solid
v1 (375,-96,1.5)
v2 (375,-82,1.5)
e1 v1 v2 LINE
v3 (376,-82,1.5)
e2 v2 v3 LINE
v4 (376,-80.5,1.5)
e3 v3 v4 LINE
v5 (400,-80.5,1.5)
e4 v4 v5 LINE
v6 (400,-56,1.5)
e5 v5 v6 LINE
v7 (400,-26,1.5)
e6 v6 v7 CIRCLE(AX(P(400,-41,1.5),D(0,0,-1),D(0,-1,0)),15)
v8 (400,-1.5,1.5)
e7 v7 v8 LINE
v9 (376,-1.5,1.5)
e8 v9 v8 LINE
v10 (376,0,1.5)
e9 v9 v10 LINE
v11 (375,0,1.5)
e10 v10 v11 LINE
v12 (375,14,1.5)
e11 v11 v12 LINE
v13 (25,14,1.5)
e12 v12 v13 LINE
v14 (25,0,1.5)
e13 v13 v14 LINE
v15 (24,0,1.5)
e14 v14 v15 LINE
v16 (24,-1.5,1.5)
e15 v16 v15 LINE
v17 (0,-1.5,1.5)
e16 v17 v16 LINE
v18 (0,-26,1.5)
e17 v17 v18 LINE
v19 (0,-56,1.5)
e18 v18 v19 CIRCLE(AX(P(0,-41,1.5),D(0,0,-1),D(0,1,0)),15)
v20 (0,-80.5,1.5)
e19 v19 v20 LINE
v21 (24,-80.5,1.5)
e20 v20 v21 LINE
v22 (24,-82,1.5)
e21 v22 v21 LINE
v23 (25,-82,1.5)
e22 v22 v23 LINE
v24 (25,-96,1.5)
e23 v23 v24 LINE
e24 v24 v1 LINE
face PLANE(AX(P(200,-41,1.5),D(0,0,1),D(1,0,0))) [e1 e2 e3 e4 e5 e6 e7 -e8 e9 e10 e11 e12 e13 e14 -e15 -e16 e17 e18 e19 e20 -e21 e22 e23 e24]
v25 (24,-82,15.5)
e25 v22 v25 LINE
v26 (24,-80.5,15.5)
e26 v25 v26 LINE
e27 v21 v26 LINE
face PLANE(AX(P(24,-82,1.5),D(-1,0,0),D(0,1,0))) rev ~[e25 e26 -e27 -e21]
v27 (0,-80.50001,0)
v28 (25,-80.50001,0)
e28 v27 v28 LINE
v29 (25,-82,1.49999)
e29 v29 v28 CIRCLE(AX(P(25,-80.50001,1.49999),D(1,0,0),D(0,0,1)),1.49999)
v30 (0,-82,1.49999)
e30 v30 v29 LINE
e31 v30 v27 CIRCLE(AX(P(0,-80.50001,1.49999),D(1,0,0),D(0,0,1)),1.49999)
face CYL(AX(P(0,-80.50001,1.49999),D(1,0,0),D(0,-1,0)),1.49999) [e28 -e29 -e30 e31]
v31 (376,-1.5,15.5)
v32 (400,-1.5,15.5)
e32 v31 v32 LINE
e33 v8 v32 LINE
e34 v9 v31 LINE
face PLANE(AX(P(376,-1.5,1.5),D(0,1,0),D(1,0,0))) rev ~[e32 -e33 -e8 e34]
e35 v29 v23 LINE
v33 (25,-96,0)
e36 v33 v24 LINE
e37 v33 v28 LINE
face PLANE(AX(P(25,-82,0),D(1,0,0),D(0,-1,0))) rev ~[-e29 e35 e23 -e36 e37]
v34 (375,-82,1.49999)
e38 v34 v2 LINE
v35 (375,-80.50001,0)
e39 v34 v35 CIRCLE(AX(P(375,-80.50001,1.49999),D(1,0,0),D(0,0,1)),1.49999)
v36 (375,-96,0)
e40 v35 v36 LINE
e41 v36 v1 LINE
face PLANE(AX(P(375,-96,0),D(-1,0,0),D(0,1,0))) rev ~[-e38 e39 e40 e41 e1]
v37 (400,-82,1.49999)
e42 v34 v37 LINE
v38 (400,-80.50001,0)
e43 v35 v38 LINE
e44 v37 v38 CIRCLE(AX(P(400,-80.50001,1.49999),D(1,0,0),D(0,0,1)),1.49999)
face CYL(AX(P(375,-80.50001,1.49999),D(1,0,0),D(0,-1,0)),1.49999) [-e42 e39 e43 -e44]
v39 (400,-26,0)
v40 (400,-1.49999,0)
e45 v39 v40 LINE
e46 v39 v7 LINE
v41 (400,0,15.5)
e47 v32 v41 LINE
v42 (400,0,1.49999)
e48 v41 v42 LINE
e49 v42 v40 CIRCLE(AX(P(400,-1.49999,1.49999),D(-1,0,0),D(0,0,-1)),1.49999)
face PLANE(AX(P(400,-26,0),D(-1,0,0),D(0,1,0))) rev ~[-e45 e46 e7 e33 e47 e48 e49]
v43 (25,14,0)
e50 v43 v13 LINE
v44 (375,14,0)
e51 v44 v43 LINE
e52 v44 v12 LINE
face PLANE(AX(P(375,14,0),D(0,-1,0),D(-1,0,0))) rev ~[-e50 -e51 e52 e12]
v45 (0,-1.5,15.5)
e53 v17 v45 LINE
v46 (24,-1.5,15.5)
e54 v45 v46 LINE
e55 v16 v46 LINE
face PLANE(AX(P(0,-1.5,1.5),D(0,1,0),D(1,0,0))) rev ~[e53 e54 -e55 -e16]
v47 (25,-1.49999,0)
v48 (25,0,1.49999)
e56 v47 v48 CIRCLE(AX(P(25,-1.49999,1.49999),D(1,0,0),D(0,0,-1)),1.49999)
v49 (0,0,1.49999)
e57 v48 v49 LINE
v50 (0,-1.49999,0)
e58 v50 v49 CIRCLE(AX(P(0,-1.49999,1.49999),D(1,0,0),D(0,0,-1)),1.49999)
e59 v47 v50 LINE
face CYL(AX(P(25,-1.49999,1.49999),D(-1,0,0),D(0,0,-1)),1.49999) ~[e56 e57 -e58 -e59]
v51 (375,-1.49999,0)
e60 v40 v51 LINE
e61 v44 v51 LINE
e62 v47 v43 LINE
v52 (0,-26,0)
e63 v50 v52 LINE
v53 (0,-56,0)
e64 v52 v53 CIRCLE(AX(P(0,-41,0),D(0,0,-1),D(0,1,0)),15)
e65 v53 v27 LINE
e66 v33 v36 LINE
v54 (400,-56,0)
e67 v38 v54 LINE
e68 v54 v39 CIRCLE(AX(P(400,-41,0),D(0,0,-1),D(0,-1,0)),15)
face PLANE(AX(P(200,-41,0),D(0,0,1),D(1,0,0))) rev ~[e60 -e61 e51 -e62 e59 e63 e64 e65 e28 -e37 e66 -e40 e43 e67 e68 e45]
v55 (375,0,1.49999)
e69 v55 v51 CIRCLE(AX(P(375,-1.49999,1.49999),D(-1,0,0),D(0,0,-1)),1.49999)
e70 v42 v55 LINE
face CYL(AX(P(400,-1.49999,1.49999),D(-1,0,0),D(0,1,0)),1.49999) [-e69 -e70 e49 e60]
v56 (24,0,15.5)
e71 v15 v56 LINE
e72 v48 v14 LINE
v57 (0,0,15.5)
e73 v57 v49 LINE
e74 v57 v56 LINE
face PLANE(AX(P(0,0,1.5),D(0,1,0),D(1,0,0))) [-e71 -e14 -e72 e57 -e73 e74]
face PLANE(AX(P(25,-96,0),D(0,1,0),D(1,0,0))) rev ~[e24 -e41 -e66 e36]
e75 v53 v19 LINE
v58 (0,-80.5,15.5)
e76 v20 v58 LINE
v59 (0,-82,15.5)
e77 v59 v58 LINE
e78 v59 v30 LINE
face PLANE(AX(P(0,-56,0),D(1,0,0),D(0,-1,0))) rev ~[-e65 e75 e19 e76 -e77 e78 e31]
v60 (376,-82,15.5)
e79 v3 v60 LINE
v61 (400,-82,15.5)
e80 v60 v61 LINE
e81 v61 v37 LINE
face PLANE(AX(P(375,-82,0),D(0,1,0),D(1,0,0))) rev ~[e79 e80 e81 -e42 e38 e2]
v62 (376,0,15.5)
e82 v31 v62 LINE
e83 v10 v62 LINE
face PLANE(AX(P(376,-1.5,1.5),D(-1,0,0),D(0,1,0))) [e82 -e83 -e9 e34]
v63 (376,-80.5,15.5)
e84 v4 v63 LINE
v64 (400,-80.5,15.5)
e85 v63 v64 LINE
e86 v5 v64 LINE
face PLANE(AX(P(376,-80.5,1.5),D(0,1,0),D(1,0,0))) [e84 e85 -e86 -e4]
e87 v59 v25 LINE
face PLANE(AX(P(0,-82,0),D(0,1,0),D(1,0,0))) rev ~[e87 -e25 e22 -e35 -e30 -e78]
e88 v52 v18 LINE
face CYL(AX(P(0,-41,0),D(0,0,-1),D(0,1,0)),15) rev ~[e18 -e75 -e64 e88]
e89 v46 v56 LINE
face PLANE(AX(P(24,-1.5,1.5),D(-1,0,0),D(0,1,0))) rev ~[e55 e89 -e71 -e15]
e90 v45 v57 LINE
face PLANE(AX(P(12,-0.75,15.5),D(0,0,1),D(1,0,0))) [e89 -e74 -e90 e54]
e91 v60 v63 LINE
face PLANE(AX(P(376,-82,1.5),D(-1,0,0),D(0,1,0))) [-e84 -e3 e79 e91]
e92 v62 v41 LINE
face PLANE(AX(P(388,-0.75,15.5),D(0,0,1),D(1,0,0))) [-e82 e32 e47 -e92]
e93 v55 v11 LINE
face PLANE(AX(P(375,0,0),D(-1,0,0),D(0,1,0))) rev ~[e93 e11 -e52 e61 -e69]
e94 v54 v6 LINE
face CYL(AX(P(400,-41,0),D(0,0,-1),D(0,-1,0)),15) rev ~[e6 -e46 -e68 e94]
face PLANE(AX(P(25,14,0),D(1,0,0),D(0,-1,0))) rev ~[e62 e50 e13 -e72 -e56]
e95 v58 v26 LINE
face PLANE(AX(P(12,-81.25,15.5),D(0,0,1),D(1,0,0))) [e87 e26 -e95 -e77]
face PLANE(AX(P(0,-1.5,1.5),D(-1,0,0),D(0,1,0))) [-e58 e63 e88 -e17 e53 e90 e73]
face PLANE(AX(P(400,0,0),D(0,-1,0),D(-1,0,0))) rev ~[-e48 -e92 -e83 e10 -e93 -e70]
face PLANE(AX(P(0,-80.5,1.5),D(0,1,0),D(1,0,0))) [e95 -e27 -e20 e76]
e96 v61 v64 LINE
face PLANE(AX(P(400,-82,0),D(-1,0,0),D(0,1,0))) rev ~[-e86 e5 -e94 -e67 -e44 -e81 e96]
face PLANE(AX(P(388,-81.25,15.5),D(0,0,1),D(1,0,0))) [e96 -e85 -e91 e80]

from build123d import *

# Parameters (mm, degrees)
F1_DEPTH = 1.5
F3_W     = 24
F3_H     = 1.5
F4_DEPTH = 14
F5_R     = 1.49999


# Not quite as in the source:
# - a fillet or chamfer is up to 0.001 mm smaller than in the source, because OpenCascade refuses the exact size


with BuildPart() as f1:
    # F0 (on Top) → F1 (new body)
    with BuildSketch(Plane.XY):
        with BuildLine():
            Line((375, 14), (25, 14))
            Line((25, 14), (25, 0))
            Line((25, 0), (0, 0))
            Line((0, 0), (0, -26))
            ThreePointArc((0, -26), (15, -41), (0, -56))
            Line((0, -56), (0, -82))
            Line((0, -82), (25, -82))
            Line((25, -82), (25, -96))
            Line((25, -96), (375, -96))
            Line((375, -96), (375, -82))
            Line((375, -82), (400, -82))
            Line((400, -82), (400, -56))
            ThreePointArc((400, -56), (385, -41), (400, -26))
            Line((400, -26), (400, 0))
            Line((400, 0), (375, 0))
            Line((375, 0), (375, 14))
        make_face()
    extrude(amount=F1_DEPTH)

    # F3 (on face) → F4 (join)
    with BuildSketch(Plane.XY.offset(1.5)):
        with Locations((12, -0.75)):
            Rectangle(F3_W, F3_H)
        with Locations((388, -0.75)):
            Rectangle(F3_W, F3_H)
        with Locations((12, -81.25)):
            Rectangle(F3_W, F3_H)
        with Locations((388, -81.25)):
            Rectangle(F3_W, F3_H)
    extrude(amount=F4_DEPTH)

    # F5 (radius 1.5 in the source; OpenCascade refuses exactly that, so slightly less here)
    f5_edges = [f1.edges().sort_by_distance(p)[0] for p in [
        (12.5, 0, 0),
        (12.5, -82, 0),
        (387.5, -82, 0),
        (387.5, 0, 0),
    ]]
    fillet(f5_edges, radius=F5_R)


solid = f1.part
